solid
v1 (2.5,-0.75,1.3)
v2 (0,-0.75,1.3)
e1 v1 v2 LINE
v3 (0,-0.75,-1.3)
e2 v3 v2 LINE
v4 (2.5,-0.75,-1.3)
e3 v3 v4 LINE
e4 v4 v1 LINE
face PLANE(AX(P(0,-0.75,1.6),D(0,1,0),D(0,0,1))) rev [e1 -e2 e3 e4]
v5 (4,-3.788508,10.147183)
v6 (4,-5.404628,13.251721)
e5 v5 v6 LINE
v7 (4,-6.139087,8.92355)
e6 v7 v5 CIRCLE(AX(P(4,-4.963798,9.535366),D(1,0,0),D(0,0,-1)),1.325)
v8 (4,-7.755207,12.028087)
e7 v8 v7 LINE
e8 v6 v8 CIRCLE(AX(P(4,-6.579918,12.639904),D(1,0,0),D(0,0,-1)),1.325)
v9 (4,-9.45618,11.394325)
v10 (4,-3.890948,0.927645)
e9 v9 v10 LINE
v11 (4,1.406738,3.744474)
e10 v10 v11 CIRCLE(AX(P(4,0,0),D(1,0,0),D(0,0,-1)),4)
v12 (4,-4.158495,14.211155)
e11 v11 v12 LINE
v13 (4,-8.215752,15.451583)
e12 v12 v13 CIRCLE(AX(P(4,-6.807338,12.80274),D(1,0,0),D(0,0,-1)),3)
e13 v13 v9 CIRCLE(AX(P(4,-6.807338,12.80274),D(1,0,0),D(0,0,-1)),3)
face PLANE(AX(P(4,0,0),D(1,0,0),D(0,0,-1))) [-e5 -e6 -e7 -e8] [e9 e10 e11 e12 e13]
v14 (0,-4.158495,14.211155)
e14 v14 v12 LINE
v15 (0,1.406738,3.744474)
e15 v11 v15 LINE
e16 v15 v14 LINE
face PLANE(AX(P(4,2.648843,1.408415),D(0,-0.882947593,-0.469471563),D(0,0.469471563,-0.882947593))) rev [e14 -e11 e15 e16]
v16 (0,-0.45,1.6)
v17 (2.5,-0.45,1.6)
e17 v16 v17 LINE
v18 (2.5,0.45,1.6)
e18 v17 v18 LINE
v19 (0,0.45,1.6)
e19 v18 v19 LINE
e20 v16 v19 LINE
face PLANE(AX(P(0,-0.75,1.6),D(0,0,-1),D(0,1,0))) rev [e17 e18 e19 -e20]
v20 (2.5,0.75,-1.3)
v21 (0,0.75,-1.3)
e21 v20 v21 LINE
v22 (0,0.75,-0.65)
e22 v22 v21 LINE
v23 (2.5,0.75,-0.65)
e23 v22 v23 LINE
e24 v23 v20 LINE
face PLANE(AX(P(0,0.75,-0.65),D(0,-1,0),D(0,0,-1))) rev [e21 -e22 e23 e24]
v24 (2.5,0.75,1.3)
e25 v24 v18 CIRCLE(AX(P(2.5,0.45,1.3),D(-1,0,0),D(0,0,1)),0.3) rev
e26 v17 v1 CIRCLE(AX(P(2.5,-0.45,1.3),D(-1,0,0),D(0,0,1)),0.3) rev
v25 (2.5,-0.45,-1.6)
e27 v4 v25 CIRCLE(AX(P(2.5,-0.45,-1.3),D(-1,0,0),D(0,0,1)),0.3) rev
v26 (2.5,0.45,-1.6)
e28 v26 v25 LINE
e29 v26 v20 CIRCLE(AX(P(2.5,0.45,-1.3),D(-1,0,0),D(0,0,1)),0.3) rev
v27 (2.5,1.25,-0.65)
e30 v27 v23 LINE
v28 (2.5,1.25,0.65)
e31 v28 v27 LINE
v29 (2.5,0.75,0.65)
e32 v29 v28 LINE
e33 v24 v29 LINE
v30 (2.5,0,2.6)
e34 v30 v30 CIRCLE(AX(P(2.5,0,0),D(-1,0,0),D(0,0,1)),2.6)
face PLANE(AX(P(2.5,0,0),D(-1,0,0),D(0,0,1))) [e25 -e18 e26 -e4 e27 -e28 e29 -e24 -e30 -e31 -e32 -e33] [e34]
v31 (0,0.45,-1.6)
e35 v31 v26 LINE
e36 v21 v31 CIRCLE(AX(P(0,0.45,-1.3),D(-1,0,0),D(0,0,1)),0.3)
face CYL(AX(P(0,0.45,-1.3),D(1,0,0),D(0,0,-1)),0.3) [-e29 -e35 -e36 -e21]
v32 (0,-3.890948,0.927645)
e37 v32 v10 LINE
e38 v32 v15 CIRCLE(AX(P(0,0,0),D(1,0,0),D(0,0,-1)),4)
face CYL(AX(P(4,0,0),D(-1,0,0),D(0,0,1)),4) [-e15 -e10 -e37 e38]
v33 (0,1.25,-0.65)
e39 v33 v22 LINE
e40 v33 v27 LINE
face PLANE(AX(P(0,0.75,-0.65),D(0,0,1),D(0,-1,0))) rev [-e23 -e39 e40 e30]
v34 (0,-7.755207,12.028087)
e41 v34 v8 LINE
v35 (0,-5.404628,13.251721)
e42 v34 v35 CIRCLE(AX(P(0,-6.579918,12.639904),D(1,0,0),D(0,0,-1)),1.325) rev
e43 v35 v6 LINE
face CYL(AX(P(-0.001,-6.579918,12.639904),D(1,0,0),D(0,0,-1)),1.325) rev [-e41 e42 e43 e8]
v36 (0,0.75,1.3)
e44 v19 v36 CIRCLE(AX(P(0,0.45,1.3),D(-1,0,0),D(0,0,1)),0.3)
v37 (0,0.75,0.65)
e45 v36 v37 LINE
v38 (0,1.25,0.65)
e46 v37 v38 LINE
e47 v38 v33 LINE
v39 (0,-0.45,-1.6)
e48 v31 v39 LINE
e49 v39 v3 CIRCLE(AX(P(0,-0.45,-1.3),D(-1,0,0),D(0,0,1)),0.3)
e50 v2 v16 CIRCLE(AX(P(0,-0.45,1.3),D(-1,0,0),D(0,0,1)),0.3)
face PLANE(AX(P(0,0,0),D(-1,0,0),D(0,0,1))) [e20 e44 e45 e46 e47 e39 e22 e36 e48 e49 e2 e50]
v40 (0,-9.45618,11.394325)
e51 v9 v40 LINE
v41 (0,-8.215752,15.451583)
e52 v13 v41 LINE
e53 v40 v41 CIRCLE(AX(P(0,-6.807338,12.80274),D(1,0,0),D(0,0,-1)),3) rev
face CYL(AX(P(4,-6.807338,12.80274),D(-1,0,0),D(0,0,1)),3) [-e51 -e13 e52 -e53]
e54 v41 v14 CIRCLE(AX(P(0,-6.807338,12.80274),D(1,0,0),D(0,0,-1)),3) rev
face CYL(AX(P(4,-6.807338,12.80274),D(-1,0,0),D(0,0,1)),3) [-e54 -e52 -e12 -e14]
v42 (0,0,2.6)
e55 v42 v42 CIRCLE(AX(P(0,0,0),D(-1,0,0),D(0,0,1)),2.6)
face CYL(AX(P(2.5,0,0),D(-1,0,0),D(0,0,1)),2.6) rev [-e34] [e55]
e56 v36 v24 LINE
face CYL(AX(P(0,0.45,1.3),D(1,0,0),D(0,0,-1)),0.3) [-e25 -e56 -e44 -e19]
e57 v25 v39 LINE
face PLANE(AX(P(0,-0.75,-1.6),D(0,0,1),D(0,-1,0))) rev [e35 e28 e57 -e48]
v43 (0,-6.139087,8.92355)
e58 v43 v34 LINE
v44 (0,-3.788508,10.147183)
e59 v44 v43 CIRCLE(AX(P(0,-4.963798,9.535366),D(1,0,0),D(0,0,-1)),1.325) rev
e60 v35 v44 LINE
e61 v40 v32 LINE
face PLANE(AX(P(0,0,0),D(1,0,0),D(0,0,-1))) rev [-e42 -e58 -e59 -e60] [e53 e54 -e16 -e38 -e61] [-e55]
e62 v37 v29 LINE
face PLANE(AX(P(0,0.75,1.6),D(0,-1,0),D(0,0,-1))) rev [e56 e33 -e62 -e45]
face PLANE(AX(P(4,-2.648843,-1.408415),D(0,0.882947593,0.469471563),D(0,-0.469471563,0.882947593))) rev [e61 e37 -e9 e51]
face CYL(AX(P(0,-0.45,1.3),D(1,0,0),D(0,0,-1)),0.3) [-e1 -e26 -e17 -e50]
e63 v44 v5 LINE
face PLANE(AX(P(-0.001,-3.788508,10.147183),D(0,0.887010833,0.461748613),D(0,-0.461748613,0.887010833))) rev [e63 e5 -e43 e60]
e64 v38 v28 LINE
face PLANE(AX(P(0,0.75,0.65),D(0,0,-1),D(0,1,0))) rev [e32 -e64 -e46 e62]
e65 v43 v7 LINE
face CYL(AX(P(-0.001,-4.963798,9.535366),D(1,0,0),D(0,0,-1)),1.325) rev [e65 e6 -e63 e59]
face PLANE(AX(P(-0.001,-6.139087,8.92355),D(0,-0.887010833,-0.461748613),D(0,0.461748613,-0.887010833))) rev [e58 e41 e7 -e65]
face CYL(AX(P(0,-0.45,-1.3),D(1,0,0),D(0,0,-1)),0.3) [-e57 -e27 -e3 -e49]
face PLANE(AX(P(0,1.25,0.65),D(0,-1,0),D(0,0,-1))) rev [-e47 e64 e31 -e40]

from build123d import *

# Parameters (mm, degrees)
SKETCH5_R           = 4
BOSS_EXTRUDE2_DEPTH = 4
BOSS_EXTRUDE3_DEPTH = 4
SKETCH7_R           = 2.6
CUT_EXTRUDE3_DEPTH  = 2.5
BOSS_EXTRUDE4_DEPTH = 2.5
FILLET1_R           = 0.3
CUT_EXTRUDE4_REACH  = 22.452
FILLET2_R           = 3


with BuildPart() as part:
    # Sketch5 → Boss-Extrude2 (new body)
    with BuildSketch(Plane(origin=(0, 0, 0), x_dir=(0, 0, -1), z_dir=(1, 0, 0))):
        Circle(SKETCH5_R)
    extrude(amount=BOSS_EXTRUDE2_DEPTH)

    # Sketch6 → Boss-Extrude3 (add)
    with BuildSketch(Plane(origin=(0, 0, 0), x_dir=(0, 0, -1), z_dir=(1, 0, 0))):
        Polygon((-1.408414688, 2.648842779), (1.408414688, -2.648842779), (-14.043168187, -10.864595127), (-16.859997563, -5.56690957), align=None)
    extrude(amount=BOSS_EXTRUDE3_DEPTH)

    # Sketch7 → Cut-Extrude3 (cut)
    with BuildSketch(Plane.ZY):
        Circle(SKETCH7_R)
    extrude(amount=-CUT_EXTRUDE3_DEPTH, mode=Mode.SUBTRACT)

    # Sketch8 → Boss-Extrude4 (add)
    with BuildSketch(Plane.ZY.offset(-2.5)):
        Polygon((1.6, -0.75), (-1.6, -0.75), (-1.6, 0.75), (-0.65, 0.75), (-0.65, 1.25), (0.65, 1.25), (0.65, 0.75), (1.6, 0.75), align=None)
    extrude(amount=BOSS_EXTRUDE4_DEPTH)

    # Fillet1
    fillet1_edges = [part.edges().sort_by_distance(p)[0] for p in [
        (1.25, -0.75, 1.6),
        (1.25, 0.75, 1.6),
        (1.25, 0.75, -1.6),
        (1.25, -0.75, -1.6),
    ]]
    fillet(fillet1_edges, radius=FILLET1_R)

    # Sketch10 → Cut-Extrude4 (cut, up to next)
    with BuildSketch(Plane(origin=(4, 0, 0), x_dir=(0, 0, -1), z_dir=(1, 0, 0)), mode=Mode.PRIVATE) as cut_extrude4_sk1:
        with BuildLine():
            Line((-8.923549544, -6.139086946), (-12.02808746, -7.755207093))
            ThreePointArc((-12.02808746, -7.755207093), (-13.815193727, -7.191734651), (-13.251721285, -5.404628385))
            Line((-13.251721285, -5.404628385), (-10.147183369, -3.788508238))
            ThreePointArc((-10.147183369, -3.788508238), (-8.360077103, -4.35198068), (-8.923549544, -6.139086946))
        make_face()
    cut_extrude4_tool1 = extrude(cut_extrude4_sk1.sketch, amount=-CUT_EXTRUDE4_REACH, mode=Mode.PRIVATE) & part.part
    add(cut_extrude4_tool1.solids().sort_by_distance((4, -5.771858, 11.087635))[0], mode=Mode.SUBTRACT)

    # Fillet2
    fillet2_edges = [part.edges().sort_by_distance(p)[0] for p in [
        (2, -10.864595127, 14.043168187),
        (2, -5.56690957, 16.859997563),
    ]]
    fillet(fillet2_edges, radius=FILLET2_R - 0.0001)  # a hair under: the kernel refuses the full size


solid = part.part
